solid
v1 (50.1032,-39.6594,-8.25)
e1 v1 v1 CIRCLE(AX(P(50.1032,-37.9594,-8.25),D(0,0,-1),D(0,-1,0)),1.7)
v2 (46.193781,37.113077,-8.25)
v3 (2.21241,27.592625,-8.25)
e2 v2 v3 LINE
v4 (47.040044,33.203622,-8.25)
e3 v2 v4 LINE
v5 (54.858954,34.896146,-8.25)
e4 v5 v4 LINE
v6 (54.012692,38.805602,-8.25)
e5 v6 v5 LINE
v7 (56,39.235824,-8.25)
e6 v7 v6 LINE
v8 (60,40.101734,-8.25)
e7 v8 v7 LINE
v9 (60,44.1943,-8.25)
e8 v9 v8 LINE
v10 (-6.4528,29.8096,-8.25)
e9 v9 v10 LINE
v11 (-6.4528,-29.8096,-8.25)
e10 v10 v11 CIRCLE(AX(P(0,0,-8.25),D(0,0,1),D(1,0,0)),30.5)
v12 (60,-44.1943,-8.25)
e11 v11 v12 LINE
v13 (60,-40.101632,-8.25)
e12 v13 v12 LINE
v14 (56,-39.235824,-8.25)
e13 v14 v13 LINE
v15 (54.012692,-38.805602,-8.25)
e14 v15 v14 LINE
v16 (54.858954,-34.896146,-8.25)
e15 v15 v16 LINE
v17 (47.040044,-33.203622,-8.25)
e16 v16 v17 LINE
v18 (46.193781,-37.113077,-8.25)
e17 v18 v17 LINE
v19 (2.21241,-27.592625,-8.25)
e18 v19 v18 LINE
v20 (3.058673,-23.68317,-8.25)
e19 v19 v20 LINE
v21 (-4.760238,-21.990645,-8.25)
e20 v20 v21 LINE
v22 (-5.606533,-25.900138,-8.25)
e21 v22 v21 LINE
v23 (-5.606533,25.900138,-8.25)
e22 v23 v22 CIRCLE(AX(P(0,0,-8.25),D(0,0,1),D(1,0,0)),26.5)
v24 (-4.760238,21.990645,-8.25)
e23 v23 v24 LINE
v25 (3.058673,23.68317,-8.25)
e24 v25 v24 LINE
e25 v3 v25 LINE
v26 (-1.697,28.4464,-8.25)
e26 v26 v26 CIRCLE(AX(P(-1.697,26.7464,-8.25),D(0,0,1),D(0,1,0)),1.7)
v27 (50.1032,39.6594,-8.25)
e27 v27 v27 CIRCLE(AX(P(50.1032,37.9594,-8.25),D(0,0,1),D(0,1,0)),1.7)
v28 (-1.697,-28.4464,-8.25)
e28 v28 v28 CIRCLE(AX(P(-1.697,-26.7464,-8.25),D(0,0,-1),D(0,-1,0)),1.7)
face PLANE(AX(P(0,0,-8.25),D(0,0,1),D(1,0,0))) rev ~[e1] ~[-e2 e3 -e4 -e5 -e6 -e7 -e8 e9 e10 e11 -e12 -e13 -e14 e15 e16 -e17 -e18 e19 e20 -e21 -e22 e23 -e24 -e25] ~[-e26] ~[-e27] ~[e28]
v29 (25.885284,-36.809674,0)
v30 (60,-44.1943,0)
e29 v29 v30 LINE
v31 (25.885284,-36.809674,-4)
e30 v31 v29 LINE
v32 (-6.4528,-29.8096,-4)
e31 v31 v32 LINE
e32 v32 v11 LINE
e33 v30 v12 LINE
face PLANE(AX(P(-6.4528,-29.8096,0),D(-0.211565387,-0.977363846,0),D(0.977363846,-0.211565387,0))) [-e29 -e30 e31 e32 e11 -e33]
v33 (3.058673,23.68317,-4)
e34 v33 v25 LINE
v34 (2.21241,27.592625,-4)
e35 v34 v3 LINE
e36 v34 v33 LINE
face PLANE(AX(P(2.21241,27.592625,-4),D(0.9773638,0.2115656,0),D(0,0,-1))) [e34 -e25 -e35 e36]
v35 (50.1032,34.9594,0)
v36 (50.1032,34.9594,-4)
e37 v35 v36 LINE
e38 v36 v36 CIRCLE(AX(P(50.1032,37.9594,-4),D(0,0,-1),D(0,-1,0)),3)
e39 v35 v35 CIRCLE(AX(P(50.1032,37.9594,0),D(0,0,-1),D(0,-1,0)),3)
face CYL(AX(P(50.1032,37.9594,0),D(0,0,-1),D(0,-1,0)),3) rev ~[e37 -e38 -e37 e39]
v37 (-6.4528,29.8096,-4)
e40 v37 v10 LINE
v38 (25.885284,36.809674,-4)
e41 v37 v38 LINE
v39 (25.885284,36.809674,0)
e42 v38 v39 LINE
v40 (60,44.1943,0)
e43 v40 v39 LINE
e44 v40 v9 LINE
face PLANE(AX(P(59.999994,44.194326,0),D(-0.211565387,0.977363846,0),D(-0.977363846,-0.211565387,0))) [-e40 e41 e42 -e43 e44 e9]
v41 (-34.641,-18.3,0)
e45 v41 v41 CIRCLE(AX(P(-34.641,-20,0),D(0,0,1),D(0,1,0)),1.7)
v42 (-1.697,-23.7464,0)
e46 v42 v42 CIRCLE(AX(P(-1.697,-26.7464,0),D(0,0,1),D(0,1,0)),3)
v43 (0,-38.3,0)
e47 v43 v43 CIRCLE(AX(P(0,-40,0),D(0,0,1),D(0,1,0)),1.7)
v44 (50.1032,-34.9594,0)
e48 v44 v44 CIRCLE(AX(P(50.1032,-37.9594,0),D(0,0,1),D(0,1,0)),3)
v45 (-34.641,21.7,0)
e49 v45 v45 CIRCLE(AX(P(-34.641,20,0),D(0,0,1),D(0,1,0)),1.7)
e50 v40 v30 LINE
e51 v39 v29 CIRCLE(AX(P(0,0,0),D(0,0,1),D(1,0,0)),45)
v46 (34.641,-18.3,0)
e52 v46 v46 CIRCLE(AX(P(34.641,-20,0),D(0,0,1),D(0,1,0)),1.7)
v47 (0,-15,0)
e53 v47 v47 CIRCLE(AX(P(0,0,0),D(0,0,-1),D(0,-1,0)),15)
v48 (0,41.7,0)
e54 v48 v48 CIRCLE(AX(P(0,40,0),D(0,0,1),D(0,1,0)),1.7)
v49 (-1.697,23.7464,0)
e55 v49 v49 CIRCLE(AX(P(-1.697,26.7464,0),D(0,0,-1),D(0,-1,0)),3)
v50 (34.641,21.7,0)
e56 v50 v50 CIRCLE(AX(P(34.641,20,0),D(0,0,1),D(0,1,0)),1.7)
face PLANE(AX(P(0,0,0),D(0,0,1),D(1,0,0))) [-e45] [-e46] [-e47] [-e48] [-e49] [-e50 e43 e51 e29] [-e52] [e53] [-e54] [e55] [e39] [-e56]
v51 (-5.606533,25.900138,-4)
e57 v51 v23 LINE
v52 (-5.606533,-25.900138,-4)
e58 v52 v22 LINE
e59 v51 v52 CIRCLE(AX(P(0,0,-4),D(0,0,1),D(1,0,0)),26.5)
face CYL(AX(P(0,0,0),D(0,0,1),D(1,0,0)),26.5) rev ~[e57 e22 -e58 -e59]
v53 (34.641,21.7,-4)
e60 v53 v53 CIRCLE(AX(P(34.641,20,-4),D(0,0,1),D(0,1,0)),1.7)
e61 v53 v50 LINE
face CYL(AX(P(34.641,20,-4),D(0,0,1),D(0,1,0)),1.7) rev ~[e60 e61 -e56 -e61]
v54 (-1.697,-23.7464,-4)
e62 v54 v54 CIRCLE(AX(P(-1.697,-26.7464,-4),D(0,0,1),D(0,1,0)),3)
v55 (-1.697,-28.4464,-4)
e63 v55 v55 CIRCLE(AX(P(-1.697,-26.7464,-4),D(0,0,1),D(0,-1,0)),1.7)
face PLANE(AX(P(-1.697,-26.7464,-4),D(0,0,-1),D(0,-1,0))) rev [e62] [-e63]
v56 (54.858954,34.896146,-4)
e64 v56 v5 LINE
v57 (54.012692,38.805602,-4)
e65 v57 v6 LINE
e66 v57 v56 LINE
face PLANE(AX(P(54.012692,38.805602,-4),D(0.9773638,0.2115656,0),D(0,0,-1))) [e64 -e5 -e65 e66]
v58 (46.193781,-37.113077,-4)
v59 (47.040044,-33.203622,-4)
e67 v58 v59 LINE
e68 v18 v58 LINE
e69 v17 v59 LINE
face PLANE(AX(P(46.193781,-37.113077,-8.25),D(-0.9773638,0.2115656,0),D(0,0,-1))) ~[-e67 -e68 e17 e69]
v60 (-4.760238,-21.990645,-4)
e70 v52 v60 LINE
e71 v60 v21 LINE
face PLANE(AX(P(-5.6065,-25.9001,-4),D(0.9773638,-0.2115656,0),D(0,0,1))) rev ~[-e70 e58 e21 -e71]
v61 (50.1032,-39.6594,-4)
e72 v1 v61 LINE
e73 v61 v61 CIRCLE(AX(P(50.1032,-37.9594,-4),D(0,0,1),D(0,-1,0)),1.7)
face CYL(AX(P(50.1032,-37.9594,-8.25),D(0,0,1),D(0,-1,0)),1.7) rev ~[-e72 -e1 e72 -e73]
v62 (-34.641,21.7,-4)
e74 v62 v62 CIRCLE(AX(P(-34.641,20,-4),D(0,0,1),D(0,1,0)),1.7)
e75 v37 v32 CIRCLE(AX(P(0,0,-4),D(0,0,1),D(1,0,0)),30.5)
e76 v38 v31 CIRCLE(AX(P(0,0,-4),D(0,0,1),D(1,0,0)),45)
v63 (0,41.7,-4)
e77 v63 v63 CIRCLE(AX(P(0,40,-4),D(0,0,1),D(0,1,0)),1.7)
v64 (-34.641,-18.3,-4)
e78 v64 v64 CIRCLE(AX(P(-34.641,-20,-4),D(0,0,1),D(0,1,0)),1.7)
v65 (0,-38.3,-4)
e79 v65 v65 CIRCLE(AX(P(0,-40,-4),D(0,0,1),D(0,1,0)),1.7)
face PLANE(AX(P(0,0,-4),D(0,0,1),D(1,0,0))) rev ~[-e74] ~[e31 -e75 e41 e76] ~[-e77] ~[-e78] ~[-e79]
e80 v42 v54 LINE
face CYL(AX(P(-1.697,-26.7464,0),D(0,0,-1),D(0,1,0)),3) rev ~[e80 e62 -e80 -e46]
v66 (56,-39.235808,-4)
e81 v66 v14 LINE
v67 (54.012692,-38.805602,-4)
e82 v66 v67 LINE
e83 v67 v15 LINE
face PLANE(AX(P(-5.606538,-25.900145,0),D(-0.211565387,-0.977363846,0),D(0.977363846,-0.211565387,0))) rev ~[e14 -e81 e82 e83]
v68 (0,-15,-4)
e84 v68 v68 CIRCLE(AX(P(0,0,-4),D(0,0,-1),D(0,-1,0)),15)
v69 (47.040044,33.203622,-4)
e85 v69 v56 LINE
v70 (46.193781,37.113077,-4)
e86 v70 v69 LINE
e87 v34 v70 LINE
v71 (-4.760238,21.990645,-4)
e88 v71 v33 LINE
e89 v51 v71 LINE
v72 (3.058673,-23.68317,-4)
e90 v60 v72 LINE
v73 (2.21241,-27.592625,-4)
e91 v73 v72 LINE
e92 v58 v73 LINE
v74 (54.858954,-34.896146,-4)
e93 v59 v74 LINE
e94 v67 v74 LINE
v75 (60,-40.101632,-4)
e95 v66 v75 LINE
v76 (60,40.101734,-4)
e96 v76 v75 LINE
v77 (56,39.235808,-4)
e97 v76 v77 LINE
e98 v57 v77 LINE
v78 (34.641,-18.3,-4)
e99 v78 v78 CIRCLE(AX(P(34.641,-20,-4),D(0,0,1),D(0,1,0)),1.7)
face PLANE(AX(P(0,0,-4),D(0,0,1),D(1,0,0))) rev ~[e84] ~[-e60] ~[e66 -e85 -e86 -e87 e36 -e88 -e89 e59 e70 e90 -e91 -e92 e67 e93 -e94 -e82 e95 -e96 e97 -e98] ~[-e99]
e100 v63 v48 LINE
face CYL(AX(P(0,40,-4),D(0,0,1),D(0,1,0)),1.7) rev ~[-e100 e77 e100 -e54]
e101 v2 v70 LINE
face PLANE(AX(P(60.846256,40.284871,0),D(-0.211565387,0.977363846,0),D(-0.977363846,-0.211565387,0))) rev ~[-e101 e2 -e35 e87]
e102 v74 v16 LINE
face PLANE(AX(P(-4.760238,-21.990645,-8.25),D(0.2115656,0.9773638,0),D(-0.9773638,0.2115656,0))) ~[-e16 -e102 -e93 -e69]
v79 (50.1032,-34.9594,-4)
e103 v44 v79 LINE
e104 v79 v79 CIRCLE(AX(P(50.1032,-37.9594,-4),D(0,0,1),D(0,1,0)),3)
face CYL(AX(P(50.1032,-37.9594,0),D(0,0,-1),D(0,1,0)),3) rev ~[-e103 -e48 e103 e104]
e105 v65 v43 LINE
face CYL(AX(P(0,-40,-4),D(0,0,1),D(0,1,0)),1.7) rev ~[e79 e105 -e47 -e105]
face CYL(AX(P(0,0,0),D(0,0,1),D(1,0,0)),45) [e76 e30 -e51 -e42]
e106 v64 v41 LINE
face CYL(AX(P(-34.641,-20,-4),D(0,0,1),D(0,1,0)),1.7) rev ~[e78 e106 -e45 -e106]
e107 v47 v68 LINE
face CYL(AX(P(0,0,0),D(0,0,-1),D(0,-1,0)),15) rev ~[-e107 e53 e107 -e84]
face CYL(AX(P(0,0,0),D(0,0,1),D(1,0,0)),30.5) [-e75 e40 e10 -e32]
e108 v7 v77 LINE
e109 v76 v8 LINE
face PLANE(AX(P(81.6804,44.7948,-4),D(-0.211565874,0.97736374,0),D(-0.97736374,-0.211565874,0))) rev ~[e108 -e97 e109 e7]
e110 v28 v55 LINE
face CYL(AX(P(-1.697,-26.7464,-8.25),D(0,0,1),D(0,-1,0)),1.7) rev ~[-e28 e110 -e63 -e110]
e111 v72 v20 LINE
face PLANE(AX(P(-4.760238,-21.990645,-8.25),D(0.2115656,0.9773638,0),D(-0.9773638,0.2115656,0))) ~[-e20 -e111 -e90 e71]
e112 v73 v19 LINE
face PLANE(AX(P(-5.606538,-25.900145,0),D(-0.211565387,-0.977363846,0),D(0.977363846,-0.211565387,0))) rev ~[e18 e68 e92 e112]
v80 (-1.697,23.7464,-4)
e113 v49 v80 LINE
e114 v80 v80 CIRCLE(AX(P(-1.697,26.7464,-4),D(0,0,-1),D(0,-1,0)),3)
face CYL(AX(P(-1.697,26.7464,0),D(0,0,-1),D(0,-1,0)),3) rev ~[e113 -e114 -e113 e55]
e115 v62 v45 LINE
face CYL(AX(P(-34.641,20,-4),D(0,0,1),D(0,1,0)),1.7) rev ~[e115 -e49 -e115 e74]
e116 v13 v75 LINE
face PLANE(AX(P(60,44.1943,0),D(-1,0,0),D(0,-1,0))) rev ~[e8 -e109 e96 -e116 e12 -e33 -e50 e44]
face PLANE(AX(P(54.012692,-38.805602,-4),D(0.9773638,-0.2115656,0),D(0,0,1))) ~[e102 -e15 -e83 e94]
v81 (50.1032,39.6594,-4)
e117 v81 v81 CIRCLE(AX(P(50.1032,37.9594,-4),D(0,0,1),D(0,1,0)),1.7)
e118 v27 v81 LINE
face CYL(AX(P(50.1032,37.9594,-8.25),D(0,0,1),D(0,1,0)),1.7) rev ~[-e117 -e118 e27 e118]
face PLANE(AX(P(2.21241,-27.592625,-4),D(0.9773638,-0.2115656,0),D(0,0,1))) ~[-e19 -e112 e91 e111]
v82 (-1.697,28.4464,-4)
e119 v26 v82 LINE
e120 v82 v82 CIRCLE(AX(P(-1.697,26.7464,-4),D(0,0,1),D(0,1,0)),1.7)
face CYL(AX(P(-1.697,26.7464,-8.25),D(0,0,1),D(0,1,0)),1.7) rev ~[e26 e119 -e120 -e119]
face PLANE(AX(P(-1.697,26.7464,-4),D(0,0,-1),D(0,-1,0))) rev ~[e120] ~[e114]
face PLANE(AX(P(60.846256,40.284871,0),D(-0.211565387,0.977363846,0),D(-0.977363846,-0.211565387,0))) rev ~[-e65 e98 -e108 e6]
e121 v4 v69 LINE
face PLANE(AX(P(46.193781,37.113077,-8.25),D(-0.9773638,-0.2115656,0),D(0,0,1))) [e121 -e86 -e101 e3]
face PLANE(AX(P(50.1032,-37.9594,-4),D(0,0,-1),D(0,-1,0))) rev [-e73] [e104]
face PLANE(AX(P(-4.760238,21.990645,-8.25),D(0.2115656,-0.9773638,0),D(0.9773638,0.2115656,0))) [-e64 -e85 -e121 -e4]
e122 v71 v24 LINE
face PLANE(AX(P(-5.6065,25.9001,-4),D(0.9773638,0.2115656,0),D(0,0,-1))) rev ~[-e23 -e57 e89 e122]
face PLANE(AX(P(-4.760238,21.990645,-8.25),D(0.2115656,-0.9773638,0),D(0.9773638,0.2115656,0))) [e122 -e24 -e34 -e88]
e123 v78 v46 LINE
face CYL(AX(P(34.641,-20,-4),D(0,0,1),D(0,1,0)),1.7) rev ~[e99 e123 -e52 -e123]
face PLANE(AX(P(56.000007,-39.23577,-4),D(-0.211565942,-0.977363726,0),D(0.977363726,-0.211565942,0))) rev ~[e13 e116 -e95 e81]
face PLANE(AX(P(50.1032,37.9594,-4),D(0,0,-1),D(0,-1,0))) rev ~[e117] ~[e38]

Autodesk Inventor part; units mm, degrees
ref_plane "YZ Plane" through (0, 0, 0) normal (1, 0, 0) x (0, 1, 0)
ref_plane "XZ Plane" through (0, 0, 0) normal (0, 1, 0) x (-1, 0, 0)
ref_plane "XY Plane" through (0, 0, 0) normal (0, 0, 1) x (1, 0, 0)
sketch "Sketch1" plane through (0, 0, 0) normal (0, 0, 1) x (1, 0, 0)
  circle A0 centre (0, 0) radius 30.5
  circle A1 centre (141.8, 0) radius 60.5
  line L0 (129.0003, 59.1305) -> (-6.4528, 29.8096)
  line L1 (-6.4528, -29.8096) -> (129.0003, -59.1305)
  line L2 (60, 44.1943) -> (60, -44.1943)
  dimension "d0" = 61
  dimension "d1" = 121
  dimension "d2" = 141.8
  dimension "d3" = 60
extrude "Extrusion1" add sketch "Sketch1" against normal blind 8.25 contours A0 | A0 L0 L2 L1
shell "Shell1" thickness 4 removed faces 1 at (37.8491, -9.9365, -8.25)
sketch "Sketch6" plane through (0, 0, 0) normal (0, 0, 1) x (1, 0, 0)
  point P0 (0, 0)
  point P1 (0, 0)
hole "Hole3" at (0, 0, 0) direction (0, 0, -1) diameter 30 end through all
sketch "Sketch12" plane through (0, 0, 0) normal (0, 0, 1) x (1, 0, 0)
  circle A0 centre (0, 0) radius 45
  circle A1 centre (0, 0) radius 15
  circle A2 centre (0, 0) radius 15 projected
  dimension "d55" = 90
extrude "Extrusion5" add sketch "Sketch12" against normal blind 4
sketch "Sketch7" plane through (56, -39.2358, -4) normal (0, 0, -1) x (-1, 0, 0)
  line L0 (26.9325, 5.83) -> (-25.6804, -5.5589)
  line L1 (-25.6804, -5.5589) -> (-25.6804, 84.0306)
  line L2 (-25.6804, 84.0306) -> (28.864, 72.2236)
  line L3 (28.864, 72.2236) -> (24.7276, 5.3527)
  line L4 (61.6065, 13.3357) -> (0, 0) projected
  line L5 (0, 78.4716) -> (61.6065, 65.136) projected
  point P0 (56, 39.2358)
extrude "Extrusion2" cut sketch "Sketch7" along normal through all
sketch "Sketch8" plane through (-5.6065, 25.9001, -8.25) normal (0.2115656, -0.9773638, 0) x (0.9773638, 0.2115656, 0)
  line L0 (0, 4.25) -> (0, 0) projected
  line L1 (67.126, 0) -> (0, 0) projected
  line L2 (0, 4.25) -> (8, 4.25)
  line L3 (8, 4.25) -> (8, 0)
  line L4 (8, 0) -> (0, 0)
  line L5 (0, 0) -> (0, 4.25)
  line L6 (53, 4.25) -> (61, 4.25)
  line L7 (61, 4.25) -> (61, 0)
  line L8 (61, 0) -> (53, 0)
  line L9 (53, 0) -> (53, 4.25)
  point P0 (0, 8.25)
  dimension "d33" = 8
  dimension "d34" = 8
  dimension "d35" = 45
extrude "Extrusion3" add sketch "Sketch8" along normal blind 4
sketch "Sketch9" plane through (0, 0, -8.25) normal (0, 0, -1) x (-1, 0, 0)
  line L0 (4.7602, 21.9907) -> (-3.0587, 23.6832) projected
  line L1 (-60, 44.1943) -> (-25.8853, 36.8097) projected
  line L2 (-46.1938, 37.1131) -> (-47.0401, 33.2037) projected
  line L3 (-47.0401, 33.2037) -> (-53.1727, 42.6863)
  line L4 (-1.3662, 31.5021) -> (4.7602, 21.9907)
  line L5 (-3.0587, 23.6832) -> (6.4528, 29.8096)
  line L6 (-47.0401, 33.2037) -> (-54.859, 34.8962) projected
  line L7 (-54.859, 34.8962) -> (-45.3475, 41.0226)
  point P0 (0, 0)
  point P1 (-50.1032, 37.9594)
  point P2 (1.697, 26.7464)
hole "Hole4" at (50.1032, 37.9594, -8.25) at (-1.697, 26.7464, -8.25) direction (0, 0, 1) diameter 3.4 end through all clearance for "Countersunk Flat Head Screw ISO 2009/7046" size "M3" standard "ISO"
sketch "Sketch10" plane through (0, 0, 0) normal (0, 0, 1) x (1, 0, 0)
  circle A0 centre (50.1032, 37.9594) radius 1.7 projected
  circle A1 centre (-1.697, 26.7464) radius 1.7 projected
  point P0 (0, 0)
hole "Hole5" at (50.1032, 37.9594, 0) at (-1.697, 26.7464, 0) direction (0, 0, -1) diameter 6 depth 4
mirror "Mirror1" about plane through (0, 0, 0) normal (0, 1, 0) of "Extrusion3", "Hole4", "Hole5"
sketch "Sketch13" plane through (0, 0, -4) normal (0, 0, -1) x (-1, 0, 0)
  line L0 (0, -40) -> (-34.641, -20)
  line L1 (-34.641, -20) -> (-34.641, 20)
  line L2 (-34.641, 20) -> (0, 40)
  line L3 (0, 40) -> (34.641, 20)
  line L4 (34.641, 20) -> (34.641, -20)
  line L5 (34.641, -20) -> (0, -40)
  point P0 (0, 0)
  point P1 (0, 0)
  dimension "d59" = 80
hole "Hole6" at (34.641, -20, -4) at (0, -40, -4) at (-34.641, -20, -4) at (-34.641, 20, -4) at (0, 40, -4) at (34.641, 20, -4) direction (0, 0, 1) diameter 3.4 end through all clearance for "Countersunk Flat Head Screw DIN EN ISO 2009" size "M3" standard "DIN"
equation "\"d34\" = d33"
properties part number "J1-sketch"
